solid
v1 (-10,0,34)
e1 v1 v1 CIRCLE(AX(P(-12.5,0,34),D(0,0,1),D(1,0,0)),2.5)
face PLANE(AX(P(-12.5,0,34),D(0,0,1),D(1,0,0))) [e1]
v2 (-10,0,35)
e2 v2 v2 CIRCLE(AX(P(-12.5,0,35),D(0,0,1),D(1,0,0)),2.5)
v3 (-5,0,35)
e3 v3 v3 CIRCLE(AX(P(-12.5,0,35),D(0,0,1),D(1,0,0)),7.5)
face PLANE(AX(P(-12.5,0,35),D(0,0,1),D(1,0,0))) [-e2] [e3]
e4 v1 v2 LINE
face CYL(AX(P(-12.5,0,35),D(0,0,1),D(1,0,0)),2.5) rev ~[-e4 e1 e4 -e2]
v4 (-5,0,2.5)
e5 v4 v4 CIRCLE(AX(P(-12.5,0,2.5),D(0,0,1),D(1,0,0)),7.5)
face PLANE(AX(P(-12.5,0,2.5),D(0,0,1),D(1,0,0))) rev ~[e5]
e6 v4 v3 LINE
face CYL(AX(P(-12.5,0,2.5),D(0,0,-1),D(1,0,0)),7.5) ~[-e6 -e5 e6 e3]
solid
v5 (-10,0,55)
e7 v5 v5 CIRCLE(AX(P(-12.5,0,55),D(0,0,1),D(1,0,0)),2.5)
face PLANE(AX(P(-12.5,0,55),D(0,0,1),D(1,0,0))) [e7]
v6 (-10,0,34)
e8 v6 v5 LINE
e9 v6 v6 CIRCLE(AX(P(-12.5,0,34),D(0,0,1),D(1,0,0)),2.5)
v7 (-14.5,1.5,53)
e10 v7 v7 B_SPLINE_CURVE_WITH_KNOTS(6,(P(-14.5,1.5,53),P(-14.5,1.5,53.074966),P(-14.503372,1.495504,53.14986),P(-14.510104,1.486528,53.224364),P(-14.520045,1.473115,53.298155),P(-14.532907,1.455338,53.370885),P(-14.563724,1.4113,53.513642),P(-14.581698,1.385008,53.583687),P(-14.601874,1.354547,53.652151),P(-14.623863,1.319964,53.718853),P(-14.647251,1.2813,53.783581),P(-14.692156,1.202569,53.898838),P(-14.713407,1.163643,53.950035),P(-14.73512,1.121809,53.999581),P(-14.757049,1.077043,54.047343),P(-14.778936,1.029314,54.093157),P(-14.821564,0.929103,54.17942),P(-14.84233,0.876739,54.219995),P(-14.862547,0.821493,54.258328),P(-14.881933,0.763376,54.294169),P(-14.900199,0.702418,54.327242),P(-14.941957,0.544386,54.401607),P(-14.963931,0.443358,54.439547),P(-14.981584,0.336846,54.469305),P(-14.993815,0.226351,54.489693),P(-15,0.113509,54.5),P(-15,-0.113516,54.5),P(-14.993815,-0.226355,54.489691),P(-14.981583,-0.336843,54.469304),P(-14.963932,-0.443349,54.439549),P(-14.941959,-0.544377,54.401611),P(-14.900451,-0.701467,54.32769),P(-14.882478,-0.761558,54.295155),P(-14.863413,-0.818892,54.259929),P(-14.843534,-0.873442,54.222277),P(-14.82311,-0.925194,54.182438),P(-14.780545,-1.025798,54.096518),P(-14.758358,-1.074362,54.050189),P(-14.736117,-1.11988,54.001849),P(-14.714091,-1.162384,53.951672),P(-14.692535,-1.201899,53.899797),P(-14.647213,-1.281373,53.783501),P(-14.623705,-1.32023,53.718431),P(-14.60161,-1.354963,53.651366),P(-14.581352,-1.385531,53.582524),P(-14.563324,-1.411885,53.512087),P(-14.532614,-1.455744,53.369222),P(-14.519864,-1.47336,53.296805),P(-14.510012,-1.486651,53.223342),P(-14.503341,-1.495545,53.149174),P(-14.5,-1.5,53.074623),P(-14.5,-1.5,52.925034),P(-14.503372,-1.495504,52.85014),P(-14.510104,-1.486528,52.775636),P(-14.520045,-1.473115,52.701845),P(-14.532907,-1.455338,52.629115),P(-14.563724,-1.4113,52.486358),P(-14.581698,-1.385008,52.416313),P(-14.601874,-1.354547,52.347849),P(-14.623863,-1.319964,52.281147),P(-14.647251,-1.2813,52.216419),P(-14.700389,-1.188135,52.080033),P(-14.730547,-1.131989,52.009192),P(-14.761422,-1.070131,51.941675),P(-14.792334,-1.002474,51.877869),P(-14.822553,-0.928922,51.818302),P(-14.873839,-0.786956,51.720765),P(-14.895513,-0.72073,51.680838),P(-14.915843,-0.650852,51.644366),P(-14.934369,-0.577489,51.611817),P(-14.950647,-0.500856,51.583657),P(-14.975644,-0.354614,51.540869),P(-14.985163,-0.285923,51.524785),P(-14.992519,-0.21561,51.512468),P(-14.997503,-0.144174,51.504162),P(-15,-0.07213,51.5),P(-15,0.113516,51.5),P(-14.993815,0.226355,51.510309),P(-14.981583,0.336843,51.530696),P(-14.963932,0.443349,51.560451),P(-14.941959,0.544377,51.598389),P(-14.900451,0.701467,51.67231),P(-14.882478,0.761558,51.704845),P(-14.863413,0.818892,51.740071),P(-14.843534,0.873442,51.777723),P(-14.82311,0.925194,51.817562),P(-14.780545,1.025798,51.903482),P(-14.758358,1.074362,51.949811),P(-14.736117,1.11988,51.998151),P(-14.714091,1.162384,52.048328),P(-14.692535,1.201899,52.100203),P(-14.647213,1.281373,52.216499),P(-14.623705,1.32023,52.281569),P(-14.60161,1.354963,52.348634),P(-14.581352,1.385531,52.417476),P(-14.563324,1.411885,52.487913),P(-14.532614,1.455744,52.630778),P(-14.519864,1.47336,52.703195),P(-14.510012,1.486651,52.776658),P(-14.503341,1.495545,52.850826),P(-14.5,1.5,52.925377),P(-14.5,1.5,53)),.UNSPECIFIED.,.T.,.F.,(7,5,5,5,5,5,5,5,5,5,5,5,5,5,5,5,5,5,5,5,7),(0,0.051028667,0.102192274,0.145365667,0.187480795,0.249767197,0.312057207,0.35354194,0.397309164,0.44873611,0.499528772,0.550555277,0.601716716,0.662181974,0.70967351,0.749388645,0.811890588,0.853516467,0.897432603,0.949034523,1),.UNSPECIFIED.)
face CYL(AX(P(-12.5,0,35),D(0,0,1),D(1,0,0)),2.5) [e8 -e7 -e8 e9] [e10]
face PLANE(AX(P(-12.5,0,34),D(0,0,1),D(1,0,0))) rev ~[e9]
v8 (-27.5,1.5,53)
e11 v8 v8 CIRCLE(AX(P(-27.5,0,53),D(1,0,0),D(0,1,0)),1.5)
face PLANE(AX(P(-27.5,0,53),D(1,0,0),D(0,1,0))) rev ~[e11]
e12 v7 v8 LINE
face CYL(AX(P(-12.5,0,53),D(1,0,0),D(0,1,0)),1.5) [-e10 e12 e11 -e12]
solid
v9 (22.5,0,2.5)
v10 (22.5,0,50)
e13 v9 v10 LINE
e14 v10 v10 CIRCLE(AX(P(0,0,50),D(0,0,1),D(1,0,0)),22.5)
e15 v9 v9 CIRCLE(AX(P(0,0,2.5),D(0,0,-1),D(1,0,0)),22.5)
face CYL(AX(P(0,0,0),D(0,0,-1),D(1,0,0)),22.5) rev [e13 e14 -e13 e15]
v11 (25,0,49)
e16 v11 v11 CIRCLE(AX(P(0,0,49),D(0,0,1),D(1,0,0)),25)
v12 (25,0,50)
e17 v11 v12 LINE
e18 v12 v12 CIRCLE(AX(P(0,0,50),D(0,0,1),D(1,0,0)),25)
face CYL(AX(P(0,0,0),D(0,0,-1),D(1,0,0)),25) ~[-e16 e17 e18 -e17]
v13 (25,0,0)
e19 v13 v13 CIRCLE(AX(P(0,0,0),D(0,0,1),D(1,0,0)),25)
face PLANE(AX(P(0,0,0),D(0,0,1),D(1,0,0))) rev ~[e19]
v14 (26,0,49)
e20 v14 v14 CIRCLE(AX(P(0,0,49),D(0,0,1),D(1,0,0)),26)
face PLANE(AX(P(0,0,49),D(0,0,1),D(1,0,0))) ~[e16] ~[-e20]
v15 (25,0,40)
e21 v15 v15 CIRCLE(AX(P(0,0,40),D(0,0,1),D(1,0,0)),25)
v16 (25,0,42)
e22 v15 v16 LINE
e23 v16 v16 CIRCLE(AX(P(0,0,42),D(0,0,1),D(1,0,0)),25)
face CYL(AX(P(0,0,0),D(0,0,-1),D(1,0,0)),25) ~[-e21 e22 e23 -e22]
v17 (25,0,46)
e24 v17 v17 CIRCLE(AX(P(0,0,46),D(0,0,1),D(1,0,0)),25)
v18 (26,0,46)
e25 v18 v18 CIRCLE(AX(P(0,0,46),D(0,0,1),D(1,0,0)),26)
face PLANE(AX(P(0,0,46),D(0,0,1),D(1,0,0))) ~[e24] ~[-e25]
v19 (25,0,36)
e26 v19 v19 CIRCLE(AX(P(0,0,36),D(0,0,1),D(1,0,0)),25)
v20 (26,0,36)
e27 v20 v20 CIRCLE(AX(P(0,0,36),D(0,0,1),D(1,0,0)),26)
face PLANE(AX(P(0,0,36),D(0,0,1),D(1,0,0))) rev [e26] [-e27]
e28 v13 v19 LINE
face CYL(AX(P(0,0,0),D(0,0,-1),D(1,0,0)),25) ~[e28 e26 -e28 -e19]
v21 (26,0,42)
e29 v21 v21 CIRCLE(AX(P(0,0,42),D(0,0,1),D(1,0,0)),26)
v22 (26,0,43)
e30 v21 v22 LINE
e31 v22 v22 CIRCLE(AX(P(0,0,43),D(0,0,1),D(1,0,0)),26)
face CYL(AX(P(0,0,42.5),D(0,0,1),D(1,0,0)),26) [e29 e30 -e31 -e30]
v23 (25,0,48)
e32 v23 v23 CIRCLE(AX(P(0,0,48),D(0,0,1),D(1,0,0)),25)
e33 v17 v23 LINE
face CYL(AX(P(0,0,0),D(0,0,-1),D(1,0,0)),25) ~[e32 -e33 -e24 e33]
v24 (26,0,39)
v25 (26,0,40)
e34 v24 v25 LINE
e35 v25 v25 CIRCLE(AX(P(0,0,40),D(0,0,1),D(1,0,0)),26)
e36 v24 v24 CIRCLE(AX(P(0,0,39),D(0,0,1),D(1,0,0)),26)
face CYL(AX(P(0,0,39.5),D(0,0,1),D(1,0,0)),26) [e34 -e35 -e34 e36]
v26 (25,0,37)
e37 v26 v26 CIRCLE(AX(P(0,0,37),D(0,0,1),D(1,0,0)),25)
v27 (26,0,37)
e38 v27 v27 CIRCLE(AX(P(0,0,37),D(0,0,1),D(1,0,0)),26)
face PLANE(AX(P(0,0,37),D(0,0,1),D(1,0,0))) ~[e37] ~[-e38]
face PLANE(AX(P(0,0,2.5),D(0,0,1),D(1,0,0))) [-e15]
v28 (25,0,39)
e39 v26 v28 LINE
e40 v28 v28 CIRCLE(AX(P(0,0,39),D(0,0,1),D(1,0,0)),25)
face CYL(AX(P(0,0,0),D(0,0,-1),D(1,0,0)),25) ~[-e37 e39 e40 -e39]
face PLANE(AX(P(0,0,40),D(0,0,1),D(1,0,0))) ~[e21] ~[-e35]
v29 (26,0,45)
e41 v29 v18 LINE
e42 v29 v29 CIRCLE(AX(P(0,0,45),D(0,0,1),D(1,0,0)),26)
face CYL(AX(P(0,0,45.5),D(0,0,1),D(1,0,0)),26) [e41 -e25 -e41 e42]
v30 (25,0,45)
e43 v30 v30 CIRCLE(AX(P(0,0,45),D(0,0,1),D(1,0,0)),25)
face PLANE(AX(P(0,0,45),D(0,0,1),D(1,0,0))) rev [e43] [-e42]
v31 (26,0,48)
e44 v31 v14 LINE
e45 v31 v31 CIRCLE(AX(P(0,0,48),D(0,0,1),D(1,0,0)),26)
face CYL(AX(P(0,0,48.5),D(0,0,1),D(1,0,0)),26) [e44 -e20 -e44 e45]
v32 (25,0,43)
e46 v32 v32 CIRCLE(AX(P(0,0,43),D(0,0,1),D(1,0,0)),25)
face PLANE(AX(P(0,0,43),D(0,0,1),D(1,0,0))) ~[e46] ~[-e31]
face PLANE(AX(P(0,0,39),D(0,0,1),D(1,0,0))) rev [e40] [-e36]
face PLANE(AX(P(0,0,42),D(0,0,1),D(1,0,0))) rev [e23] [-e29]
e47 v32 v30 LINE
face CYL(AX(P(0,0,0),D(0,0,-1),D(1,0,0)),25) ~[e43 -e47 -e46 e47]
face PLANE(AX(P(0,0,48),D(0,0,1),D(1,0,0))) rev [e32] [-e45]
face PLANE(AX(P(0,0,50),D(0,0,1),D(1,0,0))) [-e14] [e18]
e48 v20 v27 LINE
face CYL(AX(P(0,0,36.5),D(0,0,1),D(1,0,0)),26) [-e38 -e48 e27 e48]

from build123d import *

# Parameters (mm, degrees)
F0_R          = 25
F1_DEPTH      = 50
F2_T          = -2.5
F3_W          = 1
F3_H          = 1
F6_START      = 2.5
F5_R          = 7.5
F6_DEPTH      = 32.5
F7_R          = 2.5
F8_DEPTH      = 20
F8_DEPTH_BACK = 1
F11_R         = 1.5
F12_DEPTH     = 15


with BuildPart() as f1:
    # F0 (on Top) → F1 (new body)
    with BuildSketch(Plane.XY):
        Circle(F0_R)
    extrude(amount=F1_DEPTH)

    # F2
    f2_openings = [f1.faces().sort_by_distance(p)[0] for p in [
        (0, 0, 50),
    ]]
    offset(amount=F2_T, openings=f2_openings)

    # F3 (on Front) → F4 (revolve)
    with BuildSketch(Plane.XZ):
        with Locations((25.5, 48.5)):
            Rectangle(F3_W, F3_H)
        with Locations((25.5, 36.5)):
            Rectangle(F3_W, F3_H)
        with Locations((25.5, 39.5)):
            Rectangle(F3_W, F3_H)
        with Locations((25.5, 42.5)):
            Rectangle(F3_W, F3_H)
        with Locations((25.5, 45.5)):
            Rectangle(F3_W, F3_H)
    revolve(axis=Axis((0, 0, 25), (0, 0, 1)))


with BuildPart() as f6:
    # F5 (on Top) → F6 (new body)
    with BuildSketch(Plane.XY.offset(F6_START)):
        with Locations((-12.5, 0)):
            Circle(F5_R)
    extrude(amount=F6_DEPTH)


with BuildPart() as f8:
    # F7 (on face) → F8 (new body, two sides)
    with BuildSketch(Plane.XY.offset(35)) as f8_sk:
        with Locations((-12.5, 0)):
            Circle(F7_R)
    extrude(amount=F8_DEPTH)
    extrude(f8_sk.sketch, amount=-F8_DEPTH_BACK)


with BuildPart() as f6_1:
    add(f6.part)

    # F9: cut F8
    add(f8.part, mode=Mode.SUBTRACT)


with BuildPart() as f8_1:
    add(f8.part)

    # F11 (on offset) → F12 (join)
    with BuildSketch(Plane.YZ.offset(-12.5)):
        with Locations((0, 53)):
            Circle(F11_R)
    extrude(amount=-F12_DEPTH)


solid = Compound([f1.part, f6_1.part, f8_1.part])
